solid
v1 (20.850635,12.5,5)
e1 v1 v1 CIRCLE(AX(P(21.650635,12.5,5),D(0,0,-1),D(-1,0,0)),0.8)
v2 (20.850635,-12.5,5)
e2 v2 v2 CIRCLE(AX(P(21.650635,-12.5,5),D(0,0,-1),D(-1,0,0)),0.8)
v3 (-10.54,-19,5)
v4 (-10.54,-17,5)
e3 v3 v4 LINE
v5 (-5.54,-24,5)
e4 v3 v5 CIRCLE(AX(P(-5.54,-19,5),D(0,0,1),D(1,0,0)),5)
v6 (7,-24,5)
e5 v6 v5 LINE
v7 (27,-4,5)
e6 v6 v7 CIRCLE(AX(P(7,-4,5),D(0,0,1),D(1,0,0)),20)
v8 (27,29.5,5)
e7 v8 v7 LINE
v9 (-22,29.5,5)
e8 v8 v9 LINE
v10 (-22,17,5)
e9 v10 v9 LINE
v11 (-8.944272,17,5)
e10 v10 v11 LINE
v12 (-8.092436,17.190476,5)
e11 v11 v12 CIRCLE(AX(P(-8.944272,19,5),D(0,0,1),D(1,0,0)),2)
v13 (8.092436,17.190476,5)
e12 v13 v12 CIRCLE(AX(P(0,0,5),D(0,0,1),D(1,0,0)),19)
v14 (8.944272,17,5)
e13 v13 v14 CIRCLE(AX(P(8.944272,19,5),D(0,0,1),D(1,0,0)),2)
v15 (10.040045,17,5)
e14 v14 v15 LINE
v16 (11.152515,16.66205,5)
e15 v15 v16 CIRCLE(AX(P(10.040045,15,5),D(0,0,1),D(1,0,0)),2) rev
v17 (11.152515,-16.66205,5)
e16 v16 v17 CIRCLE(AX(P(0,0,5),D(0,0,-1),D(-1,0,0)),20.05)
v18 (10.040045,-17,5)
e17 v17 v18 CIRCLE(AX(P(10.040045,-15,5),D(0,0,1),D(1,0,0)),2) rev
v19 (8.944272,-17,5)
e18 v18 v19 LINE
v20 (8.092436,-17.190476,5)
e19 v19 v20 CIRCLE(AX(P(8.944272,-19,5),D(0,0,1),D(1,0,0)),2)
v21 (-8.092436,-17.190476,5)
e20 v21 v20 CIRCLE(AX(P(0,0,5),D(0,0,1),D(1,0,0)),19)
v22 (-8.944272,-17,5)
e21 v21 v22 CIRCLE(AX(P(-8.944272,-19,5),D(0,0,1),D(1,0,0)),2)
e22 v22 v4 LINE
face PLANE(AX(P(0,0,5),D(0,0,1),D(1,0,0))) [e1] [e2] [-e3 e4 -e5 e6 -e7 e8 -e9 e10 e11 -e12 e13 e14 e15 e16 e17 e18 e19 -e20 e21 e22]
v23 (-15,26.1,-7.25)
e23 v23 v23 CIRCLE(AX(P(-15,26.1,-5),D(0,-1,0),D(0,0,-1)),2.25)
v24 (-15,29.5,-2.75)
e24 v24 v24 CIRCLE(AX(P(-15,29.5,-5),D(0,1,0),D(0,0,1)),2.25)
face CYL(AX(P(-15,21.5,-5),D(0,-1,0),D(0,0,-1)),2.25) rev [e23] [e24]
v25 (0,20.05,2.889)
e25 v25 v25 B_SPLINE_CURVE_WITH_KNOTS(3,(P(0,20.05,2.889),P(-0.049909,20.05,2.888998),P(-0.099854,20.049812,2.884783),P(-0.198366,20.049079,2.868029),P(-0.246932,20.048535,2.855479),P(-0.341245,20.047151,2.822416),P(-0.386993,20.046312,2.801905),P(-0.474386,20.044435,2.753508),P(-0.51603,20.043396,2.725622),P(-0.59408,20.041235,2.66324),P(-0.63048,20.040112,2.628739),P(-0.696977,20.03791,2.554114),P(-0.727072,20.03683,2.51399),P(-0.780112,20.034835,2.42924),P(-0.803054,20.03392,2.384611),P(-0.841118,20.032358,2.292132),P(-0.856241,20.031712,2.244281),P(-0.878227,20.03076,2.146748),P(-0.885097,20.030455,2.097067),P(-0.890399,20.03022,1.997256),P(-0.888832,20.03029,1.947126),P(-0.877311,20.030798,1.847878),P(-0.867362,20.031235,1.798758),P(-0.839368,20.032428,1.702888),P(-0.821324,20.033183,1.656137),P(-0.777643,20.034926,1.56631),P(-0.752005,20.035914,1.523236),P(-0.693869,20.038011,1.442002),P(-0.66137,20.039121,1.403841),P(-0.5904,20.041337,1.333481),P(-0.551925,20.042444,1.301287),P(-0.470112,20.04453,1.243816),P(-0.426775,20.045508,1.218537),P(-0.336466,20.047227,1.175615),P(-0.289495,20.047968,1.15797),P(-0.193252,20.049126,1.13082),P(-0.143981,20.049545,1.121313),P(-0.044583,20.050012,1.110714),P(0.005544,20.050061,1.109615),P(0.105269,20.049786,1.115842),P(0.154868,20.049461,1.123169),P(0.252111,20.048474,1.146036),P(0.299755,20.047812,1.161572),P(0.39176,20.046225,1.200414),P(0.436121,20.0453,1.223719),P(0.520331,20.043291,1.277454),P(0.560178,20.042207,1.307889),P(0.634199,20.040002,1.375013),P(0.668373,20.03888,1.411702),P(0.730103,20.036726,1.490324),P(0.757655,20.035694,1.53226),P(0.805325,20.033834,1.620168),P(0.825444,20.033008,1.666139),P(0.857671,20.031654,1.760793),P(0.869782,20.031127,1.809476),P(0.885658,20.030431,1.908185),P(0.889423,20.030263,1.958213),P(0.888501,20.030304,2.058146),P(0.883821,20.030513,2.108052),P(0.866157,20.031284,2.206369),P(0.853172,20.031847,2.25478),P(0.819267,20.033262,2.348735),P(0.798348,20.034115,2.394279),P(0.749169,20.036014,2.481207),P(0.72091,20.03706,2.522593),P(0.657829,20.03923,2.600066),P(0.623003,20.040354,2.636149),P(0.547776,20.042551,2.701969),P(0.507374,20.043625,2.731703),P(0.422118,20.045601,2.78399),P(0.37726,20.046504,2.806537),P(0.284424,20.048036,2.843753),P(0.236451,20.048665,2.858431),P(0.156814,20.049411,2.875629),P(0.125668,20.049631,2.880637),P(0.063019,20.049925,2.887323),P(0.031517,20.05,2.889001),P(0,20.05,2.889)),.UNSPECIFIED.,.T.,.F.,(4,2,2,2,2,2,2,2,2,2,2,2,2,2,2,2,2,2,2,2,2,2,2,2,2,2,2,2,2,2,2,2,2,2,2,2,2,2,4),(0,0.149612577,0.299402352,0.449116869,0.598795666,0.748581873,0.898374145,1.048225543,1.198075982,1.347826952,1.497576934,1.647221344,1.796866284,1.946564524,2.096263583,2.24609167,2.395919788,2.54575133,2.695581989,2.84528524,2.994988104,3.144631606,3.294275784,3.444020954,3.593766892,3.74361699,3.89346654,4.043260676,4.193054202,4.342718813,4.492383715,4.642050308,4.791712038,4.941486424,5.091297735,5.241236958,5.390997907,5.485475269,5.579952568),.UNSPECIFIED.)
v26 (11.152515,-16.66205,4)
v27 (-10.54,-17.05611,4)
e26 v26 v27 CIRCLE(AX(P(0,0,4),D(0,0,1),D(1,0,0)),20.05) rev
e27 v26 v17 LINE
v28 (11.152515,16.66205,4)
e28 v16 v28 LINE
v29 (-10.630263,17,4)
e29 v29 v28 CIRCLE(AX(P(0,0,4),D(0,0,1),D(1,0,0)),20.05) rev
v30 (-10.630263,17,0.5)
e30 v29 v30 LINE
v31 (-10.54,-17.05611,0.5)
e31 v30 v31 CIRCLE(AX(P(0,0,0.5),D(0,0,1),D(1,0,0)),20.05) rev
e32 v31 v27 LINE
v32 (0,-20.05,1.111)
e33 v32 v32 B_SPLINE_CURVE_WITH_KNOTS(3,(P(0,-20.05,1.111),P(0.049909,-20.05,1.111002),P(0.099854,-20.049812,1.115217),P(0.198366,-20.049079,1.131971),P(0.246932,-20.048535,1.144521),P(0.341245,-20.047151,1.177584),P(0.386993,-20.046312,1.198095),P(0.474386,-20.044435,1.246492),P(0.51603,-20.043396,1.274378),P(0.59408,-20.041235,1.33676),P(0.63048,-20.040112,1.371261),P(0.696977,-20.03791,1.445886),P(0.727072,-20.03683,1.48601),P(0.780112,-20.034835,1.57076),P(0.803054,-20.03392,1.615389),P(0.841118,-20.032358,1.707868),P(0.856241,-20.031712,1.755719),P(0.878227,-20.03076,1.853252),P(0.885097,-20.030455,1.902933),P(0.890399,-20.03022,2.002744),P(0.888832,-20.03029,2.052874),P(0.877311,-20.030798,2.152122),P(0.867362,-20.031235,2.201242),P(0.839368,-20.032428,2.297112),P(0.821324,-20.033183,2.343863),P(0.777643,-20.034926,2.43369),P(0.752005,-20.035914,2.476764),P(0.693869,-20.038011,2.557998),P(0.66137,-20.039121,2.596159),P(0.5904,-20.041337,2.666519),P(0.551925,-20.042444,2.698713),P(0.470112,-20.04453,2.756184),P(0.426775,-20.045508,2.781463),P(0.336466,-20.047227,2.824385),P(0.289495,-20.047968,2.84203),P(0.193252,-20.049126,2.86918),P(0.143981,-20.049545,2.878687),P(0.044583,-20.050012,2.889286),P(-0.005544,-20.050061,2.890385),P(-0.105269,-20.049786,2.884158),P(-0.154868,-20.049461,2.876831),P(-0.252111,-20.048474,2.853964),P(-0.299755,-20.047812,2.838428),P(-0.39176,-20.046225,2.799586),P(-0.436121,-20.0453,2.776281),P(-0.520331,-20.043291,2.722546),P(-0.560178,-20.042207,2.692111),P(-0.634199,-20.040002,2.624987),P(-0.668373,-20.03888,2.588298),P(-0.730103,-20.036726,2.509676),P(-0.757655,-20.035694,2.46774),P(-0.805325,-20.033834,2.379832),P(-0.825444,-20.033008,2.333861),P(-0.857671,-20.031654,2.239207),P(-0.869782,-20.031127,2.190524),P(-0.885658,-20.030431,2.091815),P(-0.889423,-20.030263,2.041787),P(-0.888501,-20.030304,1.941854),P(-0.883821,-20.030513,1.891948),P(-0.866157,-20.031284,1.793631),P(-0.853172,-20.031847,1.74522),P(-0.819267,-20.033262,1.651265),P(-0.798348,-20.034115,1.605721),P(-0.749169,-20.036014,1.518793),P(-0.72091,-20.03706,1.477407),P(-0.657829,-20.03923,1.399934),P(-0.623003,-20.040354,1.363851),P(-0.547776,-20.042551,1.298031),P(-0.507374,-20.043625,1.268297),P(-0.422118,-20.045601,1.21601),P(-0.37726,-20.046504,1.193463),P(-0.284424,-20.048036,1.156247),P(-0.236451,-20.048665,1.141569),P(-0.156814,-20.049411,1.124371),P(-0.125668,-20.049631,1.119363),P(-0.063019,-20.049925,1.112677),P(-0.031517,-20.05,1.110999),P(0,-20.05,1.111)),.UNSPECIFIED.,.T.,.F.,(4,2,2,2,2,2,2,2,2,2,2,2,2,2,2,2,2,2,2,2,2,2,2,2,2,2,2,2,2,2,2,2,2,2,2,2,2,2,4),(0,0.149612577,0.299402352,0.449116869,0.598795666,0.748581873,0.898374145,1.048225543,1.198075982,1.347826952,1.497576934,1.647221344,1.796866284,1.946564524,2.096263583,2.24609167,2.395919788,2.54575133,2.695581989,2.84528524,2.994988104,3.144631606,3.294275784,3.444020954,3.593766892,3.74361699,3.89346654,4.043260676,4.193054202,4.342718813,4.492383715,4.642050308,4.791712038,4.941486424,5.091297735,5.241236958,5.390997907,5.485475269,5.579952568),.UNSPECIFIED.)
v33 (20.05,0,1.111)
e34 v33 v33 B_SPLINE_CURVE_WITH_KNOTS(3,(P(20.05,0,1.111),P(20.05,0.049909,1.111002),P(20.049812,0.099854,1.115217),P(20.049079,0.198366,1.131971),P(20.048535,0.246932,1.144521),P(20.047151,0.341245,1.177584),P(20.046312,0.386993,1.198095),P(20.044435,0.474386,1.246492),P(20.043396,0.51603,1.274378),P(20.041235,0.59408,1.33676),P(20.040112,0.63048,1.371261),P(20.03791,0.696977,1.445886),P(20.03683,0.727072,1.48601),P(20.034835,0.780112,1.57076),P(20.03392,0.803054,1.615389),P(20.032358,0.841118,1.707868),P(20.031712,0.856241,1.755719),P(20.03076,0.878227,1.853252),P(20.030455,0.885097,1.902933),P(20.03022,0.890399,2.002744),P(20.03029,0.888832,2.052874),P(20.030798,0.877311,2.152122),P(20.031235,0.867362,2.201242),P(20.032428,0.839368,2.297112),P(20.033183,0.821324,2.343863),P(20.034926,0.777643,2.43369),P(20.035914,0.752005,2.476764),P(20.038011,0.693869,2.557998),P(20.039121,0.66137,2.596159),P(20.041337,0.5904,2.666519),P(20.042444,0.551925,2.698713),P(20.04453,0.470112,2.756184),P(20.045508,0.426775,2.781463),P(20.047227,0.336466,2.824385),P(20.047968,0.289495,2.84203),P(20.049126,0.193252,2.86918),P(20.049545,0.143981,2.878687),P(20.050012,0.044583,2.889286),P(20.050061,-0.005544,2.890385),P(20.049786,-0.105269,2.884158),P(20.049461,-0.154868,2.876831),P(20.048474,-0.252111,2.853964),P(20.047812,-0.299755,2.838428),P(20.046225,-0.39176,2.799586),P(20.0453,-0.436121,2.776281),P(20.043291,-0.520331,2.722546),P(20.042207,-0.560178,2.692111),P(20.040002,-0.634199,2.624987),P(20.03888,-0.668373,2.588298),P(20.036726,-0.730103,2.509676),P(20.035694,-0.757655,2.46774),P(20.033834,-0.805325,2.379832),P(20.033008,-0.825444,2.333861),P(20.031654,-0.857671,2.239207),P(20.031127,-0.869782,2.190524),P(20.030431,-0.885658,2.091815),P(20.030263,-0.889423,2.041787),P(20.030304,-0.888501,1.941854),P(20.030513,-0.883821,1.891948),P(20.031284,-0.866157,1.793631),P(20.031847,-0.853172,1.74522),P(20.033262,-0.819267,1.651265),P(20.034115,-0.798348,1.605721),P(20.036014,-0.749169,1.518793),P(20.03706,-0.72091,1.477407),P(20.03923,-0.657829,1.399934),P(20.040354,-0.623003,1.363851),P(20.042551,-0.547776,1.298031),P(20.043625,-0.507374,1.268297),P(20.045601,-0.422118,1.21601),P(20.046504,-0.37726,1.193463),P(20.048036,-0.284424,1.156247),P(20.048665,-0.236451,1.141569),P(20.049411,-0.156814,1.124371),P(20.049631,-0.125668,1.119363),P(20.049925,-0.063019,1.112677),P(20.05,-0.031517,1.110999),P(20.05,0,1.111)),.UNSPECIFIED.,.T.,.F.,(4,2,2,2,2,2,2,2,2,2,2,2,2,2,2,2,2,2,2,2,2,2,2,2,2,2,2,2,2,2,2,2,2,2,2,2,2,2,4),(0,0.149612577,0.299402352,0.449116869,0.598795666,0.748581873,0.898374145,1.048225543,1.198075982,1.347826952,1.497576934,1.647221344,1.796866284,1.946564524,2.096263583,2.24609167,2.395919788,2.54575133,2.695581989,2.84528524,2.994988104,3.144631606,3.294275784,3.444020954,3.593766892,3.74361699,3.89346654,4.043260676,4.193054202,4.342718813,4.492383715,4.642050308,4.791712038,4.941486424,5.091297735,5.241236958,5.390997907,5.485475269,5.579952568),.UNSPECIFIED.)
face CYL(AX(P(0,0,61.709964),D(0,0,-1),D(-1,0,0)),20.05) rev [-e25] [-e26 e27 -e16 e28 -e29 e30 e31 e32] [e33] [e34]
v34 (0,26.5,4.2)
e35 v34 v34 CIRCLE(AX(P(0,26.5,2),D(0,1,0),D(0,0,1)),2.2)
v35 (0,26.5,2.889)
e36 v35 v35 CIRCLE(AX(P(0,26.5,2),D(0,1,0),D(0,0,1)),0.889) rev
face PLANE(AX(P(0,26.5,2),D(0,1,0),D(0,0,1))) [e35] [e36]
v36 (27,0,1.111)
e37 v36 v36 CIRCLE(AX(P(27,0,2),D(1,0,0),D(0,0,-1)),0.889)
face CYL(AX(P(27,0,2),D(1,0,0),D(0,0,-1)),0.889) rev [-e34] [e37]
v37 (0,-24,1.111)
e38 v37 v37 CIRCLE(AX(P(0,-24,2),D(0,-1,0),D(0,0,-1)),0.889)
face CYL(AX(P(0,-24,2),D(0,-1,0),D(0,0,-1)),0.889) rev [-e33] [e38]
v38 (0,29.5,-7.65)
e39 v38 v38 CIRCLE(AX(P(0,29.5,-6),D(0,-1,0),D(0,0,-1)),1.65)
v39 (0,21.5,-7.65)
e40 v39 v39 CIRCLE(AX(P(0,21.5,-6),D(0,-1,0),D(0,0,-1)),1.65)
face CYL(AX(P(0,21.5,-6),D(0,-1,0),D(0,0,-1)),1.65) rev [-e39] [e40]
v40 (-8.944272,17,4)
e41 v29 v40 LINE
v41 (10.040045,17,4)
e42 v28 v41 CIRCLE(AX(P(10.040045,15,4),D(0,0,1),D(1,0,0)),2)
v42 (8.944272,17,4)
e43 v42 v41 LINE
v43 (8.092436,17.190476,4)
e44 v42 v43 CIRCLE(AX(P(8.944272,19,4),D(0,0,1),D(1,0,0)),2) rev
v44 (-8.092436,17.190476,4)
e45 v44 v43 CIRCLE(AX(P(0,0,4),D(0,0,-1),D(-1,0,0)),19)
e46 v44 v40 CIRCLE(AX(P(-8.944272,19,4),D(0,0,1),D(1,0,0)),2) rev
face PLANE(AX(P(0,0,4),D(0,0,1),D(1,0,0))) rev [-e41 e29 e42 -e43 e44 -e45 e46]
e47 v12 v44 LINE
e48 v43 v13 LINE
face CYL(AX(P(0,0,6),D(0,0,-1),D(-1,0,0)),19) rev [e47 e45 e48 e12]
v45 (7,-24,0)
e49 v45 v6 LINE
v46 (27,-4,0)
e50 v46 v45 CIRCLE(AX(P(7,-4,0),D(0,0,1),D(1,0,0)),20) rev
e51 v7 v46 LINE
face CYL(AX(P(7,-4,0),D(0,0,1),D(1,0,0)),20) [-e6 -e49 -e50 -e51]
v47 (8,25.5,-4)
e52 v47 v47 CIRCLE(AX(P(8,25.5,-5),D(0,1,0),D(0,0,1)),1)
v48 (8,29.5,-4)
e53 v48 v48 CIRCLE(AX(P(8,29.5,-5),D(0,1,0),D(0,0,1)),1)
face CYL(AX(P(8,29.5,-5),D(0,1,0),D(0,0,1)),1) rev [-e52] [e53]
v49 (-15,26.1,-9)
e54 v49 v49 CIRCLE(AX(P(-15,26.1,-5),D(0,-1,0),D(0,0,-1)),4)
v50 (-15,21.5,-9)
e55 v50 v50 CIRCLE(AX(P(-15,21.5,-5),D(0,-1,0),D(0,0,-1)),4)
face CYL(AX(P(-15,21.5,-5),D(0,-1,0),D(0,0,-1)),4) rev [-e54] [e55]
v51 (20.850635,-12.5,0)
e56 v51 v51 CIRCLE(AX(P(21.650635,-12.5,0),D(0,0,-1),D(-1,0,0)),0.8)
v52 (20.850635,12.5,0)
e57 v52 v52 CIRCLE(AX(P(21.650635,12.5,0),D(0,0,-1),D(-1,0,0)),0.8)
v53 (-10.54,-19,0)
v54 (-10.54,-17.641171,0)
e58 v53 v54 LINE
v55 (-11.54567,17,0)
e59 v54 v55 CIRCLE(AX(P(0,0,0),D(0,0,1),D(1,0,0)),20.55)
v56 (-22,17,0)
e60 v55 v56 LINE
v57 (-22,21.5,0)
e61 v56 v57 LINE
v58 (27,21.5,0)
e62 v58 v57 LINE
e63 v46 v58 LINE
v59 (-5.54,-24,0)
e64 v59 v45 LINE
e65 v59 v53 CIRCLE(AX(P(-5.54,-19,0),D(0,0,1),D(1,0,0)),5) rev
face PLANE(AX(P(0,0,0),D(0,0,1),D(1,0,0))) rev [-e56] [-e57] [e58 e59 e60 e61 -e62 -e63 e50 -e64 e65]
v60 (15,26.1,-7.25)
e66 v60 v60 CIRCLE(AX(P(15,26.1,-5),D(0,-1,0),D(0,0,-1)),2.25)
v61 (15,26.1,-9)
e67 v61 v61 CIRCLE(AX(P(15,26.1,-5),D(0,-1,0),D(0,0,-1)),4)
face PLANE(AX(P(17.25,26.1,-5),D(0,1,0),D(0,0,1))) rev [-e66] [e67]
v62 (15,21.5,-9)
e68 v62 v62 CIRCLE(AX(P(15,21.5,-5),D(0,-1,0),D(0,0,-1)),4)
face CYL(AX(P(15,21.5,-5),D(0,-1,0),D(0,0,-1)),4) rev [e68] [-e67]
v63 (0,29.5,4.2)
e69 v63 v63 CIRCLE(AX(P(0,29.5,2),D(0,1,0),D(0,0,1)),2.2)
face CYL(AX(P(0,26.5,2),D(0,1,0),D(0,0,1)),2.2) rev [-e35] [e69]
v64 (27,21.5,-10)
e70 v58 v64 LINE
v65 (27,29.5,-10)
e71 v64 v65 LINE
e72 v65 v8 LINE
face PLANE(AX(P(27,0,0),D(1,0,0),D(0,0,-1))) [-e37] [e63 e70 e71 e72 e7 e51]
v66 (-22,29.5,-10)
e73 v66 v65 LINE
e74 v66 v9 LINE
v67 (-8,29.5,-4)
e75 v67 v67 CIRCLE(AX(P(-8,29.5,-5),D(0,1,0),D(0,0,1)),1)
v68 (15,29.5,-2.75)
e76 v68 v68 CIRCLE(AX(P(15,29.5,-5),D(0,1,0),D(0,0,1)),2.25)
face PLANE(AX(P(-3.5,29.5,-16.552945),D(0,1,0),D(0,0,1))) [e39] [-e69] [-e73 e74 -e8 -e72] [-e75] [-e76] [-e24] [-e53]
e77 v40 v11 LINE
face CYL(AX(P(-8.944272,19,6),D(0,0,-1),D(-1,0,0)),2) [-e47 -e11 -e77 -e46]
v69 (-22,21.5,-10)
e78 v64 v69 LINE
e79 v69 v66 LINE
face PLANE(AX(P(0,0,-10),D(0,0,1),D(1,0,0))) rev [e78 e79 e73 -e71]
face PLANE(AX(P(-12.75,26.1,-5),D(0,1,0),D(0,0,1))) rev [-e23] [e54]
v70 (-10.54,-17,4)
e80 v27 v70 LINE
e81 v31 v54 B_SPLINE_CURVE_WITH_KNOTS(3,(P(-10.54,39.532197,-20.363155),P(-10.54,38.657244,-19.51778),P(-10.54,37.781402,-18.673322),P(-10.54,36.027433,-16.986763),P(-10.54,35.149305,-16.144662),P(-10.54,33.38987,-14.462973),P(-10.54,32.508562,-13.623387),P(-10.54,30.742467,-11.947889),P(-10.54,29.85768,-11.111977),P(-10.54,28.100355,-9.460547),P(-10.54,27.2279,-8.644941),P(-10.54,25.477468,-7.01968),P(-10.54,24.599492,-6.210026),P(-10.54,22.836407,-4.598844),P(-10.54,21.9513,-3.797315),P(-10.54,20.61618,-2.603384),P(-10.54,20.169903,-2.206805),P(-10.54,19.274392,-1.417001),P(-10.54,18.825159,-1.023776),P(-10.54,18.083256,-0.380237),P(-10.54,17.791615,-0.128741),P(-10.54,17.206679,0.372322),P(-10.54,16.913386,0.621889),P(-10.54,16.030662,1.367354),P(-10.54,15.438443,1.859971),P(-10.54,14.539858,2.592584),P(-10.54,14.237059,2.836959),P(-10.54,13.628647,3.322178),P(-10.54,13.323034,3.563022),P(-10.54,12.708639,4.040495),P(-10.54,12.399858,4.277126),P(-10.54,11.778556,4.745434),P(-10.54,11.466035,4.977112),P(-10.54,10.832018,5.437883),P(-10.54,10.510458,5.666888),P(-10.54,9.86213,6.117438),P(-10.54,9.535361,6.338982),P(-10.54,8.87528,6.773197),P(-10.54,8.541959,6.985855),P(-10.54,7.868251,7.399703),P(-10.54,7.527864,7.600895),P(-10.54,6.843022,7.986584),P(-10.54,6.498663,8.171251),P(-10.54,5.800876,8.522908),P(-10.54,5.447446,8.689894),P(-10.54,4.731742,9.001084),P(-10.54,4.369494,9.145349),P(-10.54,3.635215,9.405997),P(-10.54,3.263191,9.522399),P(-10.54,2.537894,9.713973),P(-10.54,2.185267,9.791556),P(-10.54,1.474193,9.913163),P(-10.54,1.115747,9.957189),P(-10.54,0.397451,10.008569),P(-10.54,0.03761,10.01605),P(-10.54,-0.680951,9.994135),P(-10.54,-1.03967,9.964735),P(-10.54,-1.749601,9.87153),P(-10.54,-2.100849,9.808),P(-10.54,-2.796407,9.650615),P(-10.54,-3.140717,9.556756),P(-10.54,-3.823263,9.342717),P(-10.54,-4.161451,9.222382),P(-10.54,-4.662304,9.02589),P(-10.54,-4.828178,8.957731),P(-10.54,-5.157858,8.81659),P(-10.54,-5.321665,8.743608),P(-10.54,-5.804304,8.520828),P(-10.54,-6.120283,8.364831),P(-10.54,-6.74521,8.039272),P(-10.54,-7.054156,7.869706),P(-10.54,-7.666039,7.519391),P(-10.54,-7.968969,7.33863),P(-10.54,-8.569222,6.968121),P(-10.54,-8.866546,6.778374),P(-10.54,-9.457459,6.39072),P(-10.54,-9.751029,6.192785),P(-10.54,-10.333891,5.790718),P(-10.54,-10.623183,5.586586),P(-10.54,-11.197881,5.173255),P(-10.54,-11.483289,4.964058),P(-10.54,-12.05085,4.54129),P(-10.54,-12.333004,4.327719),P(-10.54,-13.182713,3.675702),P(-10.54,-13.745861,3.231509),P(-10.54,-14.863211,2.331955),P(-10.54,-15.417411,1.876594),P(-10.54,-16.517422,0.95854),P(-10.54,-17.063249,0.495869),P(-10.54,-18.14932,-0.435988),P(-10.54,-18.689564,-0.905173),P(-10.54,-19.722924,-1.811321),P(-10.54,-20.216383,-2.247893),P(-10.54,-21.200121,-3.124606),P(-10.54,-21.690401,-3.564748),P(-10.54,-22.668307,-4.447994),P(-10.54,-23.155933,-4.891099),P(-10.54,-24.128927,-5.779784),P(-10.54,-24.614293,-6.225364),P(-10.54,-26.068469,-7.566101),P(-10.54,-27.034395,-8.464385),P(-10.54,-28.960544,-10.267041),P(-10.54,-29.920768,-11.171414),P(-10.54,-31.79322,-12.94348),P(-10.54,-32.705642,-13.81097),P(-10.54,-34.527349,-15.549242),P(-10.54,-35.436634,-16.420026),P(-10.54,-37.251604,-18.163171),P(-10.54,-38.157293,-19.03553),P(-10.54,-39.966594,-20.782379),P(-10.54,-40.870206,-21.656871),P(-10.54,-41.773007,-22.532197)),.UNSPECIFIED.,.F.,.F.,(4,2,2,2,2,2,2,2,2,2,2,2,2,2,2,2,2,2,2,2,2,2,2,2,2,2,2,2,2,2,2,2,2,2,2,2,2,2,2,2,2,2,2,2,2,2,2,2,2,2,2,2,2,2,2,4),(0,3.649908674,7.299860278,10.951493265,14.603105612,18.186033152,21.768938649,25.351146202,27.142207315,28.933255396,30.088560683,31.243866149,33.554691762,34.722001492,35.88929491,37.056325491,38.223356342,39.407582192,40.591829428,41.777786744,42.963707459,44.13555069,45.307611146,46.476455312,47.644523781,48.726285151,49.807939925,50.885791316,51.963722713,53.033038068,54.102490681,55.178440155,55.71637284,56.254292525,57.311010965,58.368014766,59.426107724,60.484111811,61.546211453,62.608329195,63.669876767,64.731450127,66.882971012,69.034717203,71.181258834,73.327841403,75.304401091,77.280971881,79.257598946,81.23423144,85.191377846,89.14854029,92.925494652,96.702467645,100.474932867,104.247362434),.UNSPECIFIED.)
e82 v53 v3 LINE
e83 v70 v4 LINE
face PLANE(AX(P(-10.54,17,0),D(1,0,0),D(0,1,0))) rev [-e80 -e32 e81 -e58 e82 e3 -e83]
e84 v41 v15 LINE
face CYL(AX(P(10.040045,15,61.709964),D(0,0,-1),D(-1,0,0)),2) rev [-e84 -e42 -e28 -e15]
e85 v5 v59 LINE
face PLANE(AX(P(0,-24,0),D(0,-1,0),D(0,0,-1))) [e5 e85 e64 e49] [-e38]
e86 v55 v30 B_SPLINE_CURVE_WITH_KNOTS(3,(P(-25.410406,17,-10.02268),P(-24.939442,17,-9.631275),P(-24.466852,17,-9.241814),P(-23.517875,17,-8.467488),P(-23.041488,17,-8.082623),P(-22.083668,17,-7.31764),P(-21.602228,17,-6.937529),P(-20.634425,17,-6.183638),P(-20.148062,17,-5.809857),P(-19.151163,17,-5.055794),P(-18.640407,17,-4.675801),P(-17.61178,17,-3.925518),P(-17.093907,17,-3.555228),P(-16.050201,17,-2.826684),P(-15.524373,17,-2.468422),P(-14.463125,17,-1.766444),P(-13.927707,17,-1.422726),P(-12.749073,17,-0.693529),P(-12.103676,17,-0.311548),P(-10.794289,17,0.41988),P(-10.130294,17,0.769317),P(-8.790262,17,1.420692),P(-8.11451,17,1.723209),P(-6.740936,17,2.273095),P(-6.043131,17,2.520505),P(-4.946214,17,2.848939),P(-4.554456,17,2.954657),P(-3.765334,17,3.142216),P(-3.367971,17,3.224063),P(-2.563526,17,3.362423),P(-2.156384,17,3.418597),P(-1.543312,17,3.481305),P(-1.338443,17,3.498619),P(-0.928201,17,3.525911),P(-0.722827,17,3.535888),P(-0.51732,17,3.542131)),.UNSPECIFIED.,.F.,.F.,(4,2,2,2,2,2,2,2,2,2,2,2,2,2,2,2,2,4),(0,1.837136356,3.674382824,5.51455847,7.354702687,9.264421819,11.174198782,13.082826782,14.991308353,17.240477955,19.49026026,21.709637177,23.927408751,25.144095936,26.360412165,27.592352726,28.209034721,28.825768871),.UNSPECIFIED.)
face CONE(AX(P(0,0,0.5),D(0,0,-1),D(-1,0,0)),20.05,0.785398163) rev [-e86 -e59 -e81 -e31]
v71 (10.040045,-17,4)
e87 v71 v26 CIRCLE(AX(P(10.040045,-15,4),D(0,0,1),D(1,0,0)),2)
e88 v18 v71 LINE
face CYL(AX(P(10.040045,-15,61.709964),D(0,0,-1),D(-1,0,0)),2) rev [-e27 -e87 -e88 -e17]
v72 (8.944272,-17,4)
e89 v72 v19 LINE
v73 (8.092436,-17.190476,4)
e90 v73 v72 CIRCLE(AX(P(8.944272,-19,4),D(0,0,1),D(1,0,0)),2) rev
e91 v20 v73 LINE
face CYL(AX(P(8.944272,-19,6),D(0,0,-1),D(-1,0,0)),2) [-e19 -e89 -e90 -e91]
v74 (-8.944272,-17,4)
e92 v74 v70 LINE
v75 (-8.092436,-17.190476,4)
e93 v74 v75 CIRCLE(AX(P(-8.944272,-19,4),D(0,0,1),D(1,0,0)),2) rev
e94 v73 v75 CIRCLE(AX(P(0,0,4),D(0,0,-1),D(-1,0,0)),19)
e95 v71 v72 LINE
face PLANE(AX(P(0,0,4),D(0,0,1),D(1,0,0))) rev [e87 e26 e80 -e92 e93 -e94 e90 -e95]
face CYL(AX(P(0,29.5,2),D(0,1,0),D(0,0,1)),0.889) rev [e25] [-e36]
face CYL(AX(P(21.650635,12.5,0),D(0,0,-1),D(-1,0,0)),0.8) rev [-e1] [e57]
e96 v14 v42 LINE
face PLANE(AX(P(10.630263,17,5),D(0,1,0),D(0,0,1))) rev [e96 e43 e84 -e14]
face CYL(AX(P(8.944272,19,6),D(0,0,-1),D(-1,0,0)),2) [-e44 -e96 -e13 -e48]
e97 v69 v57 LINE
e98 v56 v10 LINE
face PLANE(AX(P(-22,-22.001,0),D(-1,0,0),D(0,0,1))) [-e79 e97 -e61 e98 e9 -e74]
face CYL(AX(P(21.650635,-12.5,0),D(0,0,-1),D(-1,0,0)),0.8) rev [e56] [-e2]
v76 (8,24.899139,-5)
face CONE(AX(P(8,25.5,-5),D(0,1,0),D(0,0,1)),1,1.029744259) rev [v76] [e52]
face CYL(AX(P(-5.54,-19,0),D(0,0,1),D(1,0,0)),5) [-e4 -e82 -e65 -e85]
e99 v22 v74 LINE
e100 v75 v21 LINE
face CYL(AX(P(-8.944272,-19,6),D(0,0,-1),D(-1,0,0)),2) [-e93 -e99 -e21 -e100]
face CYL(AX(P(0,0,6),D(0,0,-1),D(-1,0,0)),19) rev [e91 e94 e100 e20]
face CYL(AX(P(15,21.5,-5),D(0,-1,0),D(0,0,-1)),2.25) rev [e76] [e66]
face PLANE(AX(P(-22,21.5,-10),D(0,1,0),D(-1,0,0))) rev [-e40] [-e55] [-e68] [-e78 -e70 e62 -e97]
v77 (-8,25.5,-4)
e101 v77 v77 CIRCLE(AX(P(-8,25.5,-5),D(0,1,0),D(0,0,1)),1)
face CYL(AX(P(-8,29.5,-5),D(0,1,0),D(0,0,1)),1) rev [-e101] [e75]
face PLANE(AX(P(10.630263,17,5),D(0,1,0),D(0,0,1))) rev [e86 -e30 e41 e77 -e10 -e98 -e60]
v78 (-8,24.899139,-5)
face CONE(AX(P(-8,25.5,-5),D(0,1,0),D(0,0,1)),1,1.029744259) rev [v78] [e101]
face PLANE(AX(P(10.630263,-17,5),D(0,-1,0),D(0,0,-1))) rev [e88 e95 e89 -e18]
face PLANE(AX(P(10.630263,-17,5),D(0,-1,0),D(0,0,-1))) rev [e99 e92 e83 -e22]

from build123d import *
from build123d.topology import SkipClean

# Parameters (mm, degrees)
SKETCH_2_R                = 22
EXTRUDE_1_DEPTH           = 5
SKETCH_5_W                = 7
SKETCH_5_H                = 15
EXTRUDE_2_DEPTH           = 5
HOLE_WIZARD_2_56_3_D      = 1.778
HOLE_WIZARD_2_56_3_DEPTH  = 15
HOLE_WIZARD_2_56_3_TIP    = 0.534165
SKETCH_13_R               = 20.05
CUT_EXTRUDE_2_DEPTH       = 4
SKETCH_14_R               = 19
CUT_EXTRUDE_3_DEPTH       = 2
CUT_EXTRUDE_4_DEPTH       = 38.016888
EXTRUDE_3_REACH           = 58.225
EXTRUDE_3_END_RADIUS      = 22
SKETCH_16_W               = 18.5
SKETCH_16_H               = 5
FILLET_1_R                = 2
CHAMFER_1_SIZE            = 0.5
SKETCH_26_W               = 11.46
SKETCH_26_H               = 38.490745
CUT_EXTRUDE_5_DEPTH       = 38.138255
SKETCH_27_W               = 44
SKETCH_27_H               = 8
EXTRUDE_4_DEPTH           = 10
HOLE_WIZARD_2_D           = 4.5
HOLE_WIZARD_2_DEPTH       = 10.1
HOLE_WIZARD_2_CBORE_D     = 8
HOLE_WIZARD_2_CBORE_DEPTH = 4.6
HOLE_WIZARD_2_TIP         = 1.351936
EXTRUDE_5_DEPTH           = 5
EXTRUDE_6_REACH           = 60.062
EXTRUDE_6_END_RADIUS      = 22
SKETCH_32_W               = 5
SKETCH_32_H               = 22
MM_4_D                    = 2
MM_4_DEPTH                = 4
MM_4_TIP                  = 0.600861
SKETCH_41_R               = 2.2
CUT_EXTRUDE_6_DEPTH       = 3
SKETCH_45_W               = 27
SKETCH_45_H               = 5
EXTRUDE_7_DEPTH           = 2
EXTRUDE_9_REACH           = 62.756
SKETCH_47_W               = 10.54
SKETCH_47_H               = 5
HOLE_WIZARD_2_56_1_D      = 1.778
HOLE_WIZARD_2_56_1_DEPTH  = 5.73
HOLE_WIZARD_2_56_1_TIP    = 0.534165
FILLET_7_R                = 20
FILLET_8_R                = 5
HOLE_WIZARD_2_56_2_D      = 1.778
HOLE_WIZARD_M4_2_D        = 3.3
HOLE_WIZARD_M2_10_D       = 1.6


with BuildPart() as part:
    # 草图2 → 凸台-拉伸1 (new body)
    with BuildSketch(Plane.XY):
        Circle(SKETCH_2_R)
    extrude(amount=EXTRUDE_1_DEPTH)

    # 草图5 → 凸台-拉伸2 (add)
    with BuildSketch(Plane.XY.offset(5)):
        with Locations((0, 22)):
            Rectangle(SKETCH_5_W, SKETCH_5_H)
    extrude(amount=-EXTRUDE_2_DEPTH)

    # #2-56 螺纹孔3
    with Locations(Plane(origin=(0, 29.5, 2), x_dir=(0, 0, 1), z_dir=(0, 1, 0))):
        with Locations((0, 0)):
            Hole(HOLE_WIZARD_2_56_3_D / 2, depth=HOLE_WIZARD_2_56_3_DEPTH)
            with Locations((0, 0, -(HOLE_WIZARD_2_56_3_DEPTH + HOLE_WIZARD_2_56_3_TIP / 2))):  # 118° drill point
                Cone(0, HOLE_WIZARD_2_56_3_D / 2, HOLE_WIZARD_2_56_3_TIP, mode=Mode.SUBTRACT)

    # 草图13 → 切除-拉伸2 (cut)
    with BuildSketch(Plane(origin=(0, 0, 0), x_dir=(-1, 0, 0), z_dir=(0, 0, -1))):
        Circle(SKETCH_13_R)
    extrude(amount=-CUT_EXTRUDE_2_DEPTH, mode=Mode.SUBTRACT)

    # 草图14 → 切除-拉伸3 (cut)
    with BuildSketch(Plane(origin=(0, 0, 4), x_dir=(-1, 0, 0), z_dir=(0, 0, -1))):
        Circle(SKETCH_14_R)
    extrude(amount=-CUT_EXTRUDE_3_DEPTH, mode=Mode.SUBTRACT)

    # 草图15 → 切除-拉伸4 (cut, through all)
    with SkipClean():  # the faces are left unmerged after this step: merging them gives an invalid solid
        with BuildSketch(Plane(origin=(0, 0, 4), x_dir=(-1, 0, 0), z_dir=(0, 0, -1))):
            with BuildLine():
                Line((-10.630263, 17), (10.630263, 17))
                ThreePointArc((10.630263, 17), (20.05, 0), (10.630263, -17))
                Line((10.630263, -17), (-10.630263, -17))
                ThreePointArc((-10.630263, -17), (-20.05, 0), (-10.630263, 17))
            make_face()
        extrude(amount=-CUT_EXTRUDE_4_DEPTH, mode=Mode.SUBTRACT)

    # 凸台-拉伸3: up to this cylinder (the profile starts outside it)
    with SkipClean():  # the faces are left unmerged after this step: merging them gives an invalid solid
        extrude_3_end = Plane(origin=(0, 0, 2.5), z_dir=(0, 0, -1)) * Cylinder(EXTRUDE_3_END_RADIUS, 161.45, mode=Mode.PRIVATE)
        # 草图16 → 凸台-拉伸3 (add, up to the surface)
        with BuildSketch(Plane(origin=(0, 29.5, 0), x_dir=(1, 0, 0), z_dir=(0, 1, 0)), mode=Mode.PRIVATE) as extrude_3_sk1:
            with Locations((-12.75, -2.5)):
                Rectangle(SKETCH_16_W, SKETCH_16_H)
        extrude_3_tool1 = extrude(extrude_3_sk1.sketch, amount=-EXTRUDE_3_REACH, mode=Mode.PRIVATE) - extrude_3_end
        add(extrude_3_tool1.solids().sort_by_distance((-12.75, 29.5, 2.5))[0])
        # 草图16 → 凸台-拉伸3 (add, up to the surface)
        with BuildSketch(Plane(origin=(0, 29.5, 0), x_dir=(1, 0, 0), z_dir=(0, 1, 0)), mode=Mode.PRIVATE) as extrude_3_sk2:
            with Locations((12.75, -2.5)):
                Rectangle(SKETCH_16_W, SKETCH_16_H)
        extrude_3_tool2 = extrude(extrude_3_sk2.sketch, amount=-EXTRUDE_3_REACH, mode=Mode.PRIVATE) - extrude_3_end
        add(extrude_3_tool2.solids().sort_by_distance((12.75, 29.5, 2.5))[0])

    # 圆角1
    fillet_1_edges = [part.edges().sort_by_distance(p)[0] for p in [
        (8.485281, -17, 4.5),
        (-8.485281, -17, 4.5),
        (-8.485281, 17, 4.5),
        (8.485281, 17, 4.5),
        (10.630263, 17, 4.5),
        (10.630263, -17, 4.5),
    ]]
    fillet(fillet_1_edges, radius=FILLET_1_R)

    # 倒角1
    chamfer_1_edges = [part.edges().sort_by_distance(p)[0] for p in [
        (20.05, 0, 0),
    ]]
    chamfer(chamfer_1_edges, length=CHAMFER_1_SIZE)

    # 草图26 → 切除-拉伸5 (cut, through all)
    with SkipClean():  # the faces are left unmerged after this step: merging them gives an invalid solid
        with BuildSketch(Plane.XY.offset(5)):
            with Locations((-16.27, -2.245373)):
                Rectangle(SKETCH_26_W, SKETCH_26_H)
        extrude(amount=-CUT_EXTRUDE_5_DEPTH, mode=Mode.SUBTRACT)

    # 草图27 → 凸台-拉伸4 (add)
    with SkipClean():  # the faces are left unmerged after this step: merging them gives an invalid solid
        with BuildSketch(Plane(origin=(0, 0, 0), x_dir=(-1, 0, 0), z_dir=(0, 0, -1))):
            with Locations((0, 25.5)):
                Rectangle(SKETCH_27_W, SKETCH_27_H)
        extrude(amount=EXTRUDE_4_DEPTH)

    # 打孔尺寸(%根据)内六角圆柱头螺钉的类型2
    with Locations(Plane(origin=(-15, 21.5, -5), x_dir=(-1, 0, 0), z_dir=(0, -1, 0))):
        with Locations((0, 0), (-30, 0)):
            CounterBoreHole(HOLE_WIZARD_2_D / 2, HOLE_WIZARD_2_CBORE_D / 2, HOLE_WIZARD_2_CBORE_DEPTH, depth=HOLE_WIZARD_2_DEPTH)
            with Locations((0, 0, -(HOLE_WIZARD_2_DEPTH + HOLE_WIZARD_2_TIP / 2))):  # 118° drill point
                Cone(0, HOLE_WIZARD_2_D / 2, HOLE_WIZARD_2_TIP, mode=Mode.SUBTRACT)

    # 草图31 → 凸台-拉伸5 (add)
    with SkipClean():  # the faces are left unmerged after this step: merging them gives an invalid solid
        with BuildSketch(Plane(origin=(22, 0, 0), x_dir=(0, 0, -1), z_dir=(1, 0, 0))):
            Polygon((-5, 0), (0, 0), (0, 21.5), (10, 21.5), (10, 29.5), (-5, 29.5), align=None)
        extrude(amount=EXTRUDE_5_DEPTH)

    # 凸台-拉伸6: up to this cylinder (the profile starts outside it)
    with SkipClean():  # the faces are left unmerged after this step: merging them gives an invalid solid
        extrude_6_end = Plane(origin=(0, 0, 2.5), z_dir=(0, 0, -1)) * Cylinder(EXTRUDE_6_END_RADIUS, 165.124, mode=Mode.PRIVATE)
        # 草图32 → 凸台-拉伸6 (add, up to the surface)
        with BuildSketch(Plane(origin=(27, 0, 0), x_dir=(0, 0, -1), z_dir=(1, 0, 0)), mode=Mode.PRIVATE) as extrude_6_sk1:
            with Locations((-2.5, -11)):
                Rectangle(SKETCH_32_W, SKETCH_32_H)
        extrude_6_tool1 = extrude(extrude_6_sk1.sketch, amount=-EXTRUDE_6_REACH, mode=Mode.PRIVATE) - extrude_6_end
        add(extrude_6_tool1.solids().sort_by_distance((27, -11, 2.5))[0])

    # 大小mm 暗销孔4
    with Locations(Plane(origin=(-8, 29.5, -5), x_dir=(0, 0, 1), z_dir=(0, 1, 0))):
        with Locations((0, 0), (0, 16)):
            Hole(MM_4_D / 2, depth=MM_4_DEPTH)
            with Locations((0, 0, -(MM_4_DEPTH + MM_4_TIP / 2))):  # 118° drill point
                Cone(0, MM_4_D / 2, MM_4_TIP, mode=Mode.SUBTRACT)

    # 草图41 → 切除-拉伸6 (cut)
    with SkipClean():  # the faces are left unmerged after this step: merging them gives an invalid solid
        with BuildSketch(Plane(origin=(0, 29.5, 0), x_dir=(1, 0, 0), z_dir=(0, 1, 0))):
            with Locations(Location((0, -2, 0), (0, 0, 270))):
                Circle(SKETCH_41_R)
        extrude(amount=-CUT_EXTRUDE_6_DEPTH, mode=Mode.SUBTRACT)

    # 草图45 → 凸台-拉伸7 (add)
    with SkipClean():  # the faces are left unmerged after this step: merging them gives an invalid solid
        with BuildSketch(Plane.XZ.offset(22)):
            with Locations((13.5, 2.5)):
                Rectangle(SKETCH_45_W, SKETCH_45_H)
        extrude(amount=EXTRUDE_7_DEPTH)

    # 草图47 → 凸台-拉伸9 (add, up to next)
    with BuildSketch(Plane.XZ.offset(24), mode=Mode.PRIVATE) as extrude_9_sk1:
        with Locations((-5.27, 2.5)):
            Rectangle(SKETCH_47_W, SKETCH_47_H)
    extrude_9_tool1 = extrude(extrude_9_sk1.sketch, amount=-EXTRUDE_9_REACH, mode=Mode.PRIVATE) - part.part
    add(extrude_9_tool1.solids().sort_by_distance((-5.27, -24, 2.5))[0])

    # #2-56 螺纹孔1
    with Locations(Plane(origin=(0, -24, 2), x_dir=(0, 0, -1), z_dir=(0, -1, 0))):
        with Locations((0, 0)):
            Hole(HOLE_WIZARD_2_56_1_D / 2, depth=HOLE_WIZARD_2_56_1_DEPTH)
            with Locations((0, 0, -(HOLE_WIZARD_2_56_1_DEPTH + HOLE_WIZARD_2_56_1_TIP / 2))):  # 118° drill point
                Cone(0, HOLE_WIZARD_2_56_1_D / 2, HOLE_WIZARD_2_56_1_TIP, mode=Mode.SUBTRACT)

    # 圆角7
    # the kernel refuses this fillet: 20 mm, written as the material it takes off along each edge
    with BuildSketch(Plane(origin=(27, -24, -50), x_dir=(-1, 0, 0), z_dir=(0, 0, 1))) as fillet_7_piece_1:
        with BuildLine():
            CenterArc((FILLET_7_R, -FILLET_7_R), FILLET_7_R, 90, 90)
            Line((0, -FILLET_7_R), (0, 0))
            Line((0, 0), (FILLET_7_R, 0))
        make_face()
    extrude(amount=105, mode=Mode.SUBTRACT)

    # 圆角8
    # the kernel refuses this fillet: 5 mm, written as the material it takes off along each edge
    with BuildSketch(Plane(origin=(-10.54, -24, -12.5), x_dir=(0, 1, 0), z_dir=(0, 0, 1))) as fillet_8_piece_1:
        with BuildLine():
            CenterArc((FILLET_8_R, -FILLET_8_R), FILLET_8_R, 90, 90)
            Line((0, -FILLET_8_R), (0, 0))
            Line((0, 0), (FILLET_8_R, 0))
        make_face()
    extrude(amount=30, mode=Mode.SUBTRACT)

    # #2-56 螺纹孔2 (through all)
    with Locations(Plane(origin=(27, 0, 2), x_dir=(0, 0, 1), z_dir=(1, 0, 0))):
        with Locations((0, 0)):
            Hole(HOLE_WIZARD_2_56_2_D / 2)

    # M4 螺纹孔2 (through all)
    with Locations(Plane(origin=(0, 21.5, -6), x_dir=(-1, 0, 0), z_dir=(0, -1, 0))):
        with Locations((0, 0)):
            Hole(HOLE_WIZARD_M4_2_D / 2)

    # M2 螺纹孔10 (through all)
    with Locations(Plane(origin=(21.650635, 12.5, 0), x_dir=(-1, 0, 0), z_dir=(0, 0, -1))):
        with Locations((0, 0), (0, -25)):
            Hole(HOLE_WIZARD_M2_10_D / 2)


solid = part.part
